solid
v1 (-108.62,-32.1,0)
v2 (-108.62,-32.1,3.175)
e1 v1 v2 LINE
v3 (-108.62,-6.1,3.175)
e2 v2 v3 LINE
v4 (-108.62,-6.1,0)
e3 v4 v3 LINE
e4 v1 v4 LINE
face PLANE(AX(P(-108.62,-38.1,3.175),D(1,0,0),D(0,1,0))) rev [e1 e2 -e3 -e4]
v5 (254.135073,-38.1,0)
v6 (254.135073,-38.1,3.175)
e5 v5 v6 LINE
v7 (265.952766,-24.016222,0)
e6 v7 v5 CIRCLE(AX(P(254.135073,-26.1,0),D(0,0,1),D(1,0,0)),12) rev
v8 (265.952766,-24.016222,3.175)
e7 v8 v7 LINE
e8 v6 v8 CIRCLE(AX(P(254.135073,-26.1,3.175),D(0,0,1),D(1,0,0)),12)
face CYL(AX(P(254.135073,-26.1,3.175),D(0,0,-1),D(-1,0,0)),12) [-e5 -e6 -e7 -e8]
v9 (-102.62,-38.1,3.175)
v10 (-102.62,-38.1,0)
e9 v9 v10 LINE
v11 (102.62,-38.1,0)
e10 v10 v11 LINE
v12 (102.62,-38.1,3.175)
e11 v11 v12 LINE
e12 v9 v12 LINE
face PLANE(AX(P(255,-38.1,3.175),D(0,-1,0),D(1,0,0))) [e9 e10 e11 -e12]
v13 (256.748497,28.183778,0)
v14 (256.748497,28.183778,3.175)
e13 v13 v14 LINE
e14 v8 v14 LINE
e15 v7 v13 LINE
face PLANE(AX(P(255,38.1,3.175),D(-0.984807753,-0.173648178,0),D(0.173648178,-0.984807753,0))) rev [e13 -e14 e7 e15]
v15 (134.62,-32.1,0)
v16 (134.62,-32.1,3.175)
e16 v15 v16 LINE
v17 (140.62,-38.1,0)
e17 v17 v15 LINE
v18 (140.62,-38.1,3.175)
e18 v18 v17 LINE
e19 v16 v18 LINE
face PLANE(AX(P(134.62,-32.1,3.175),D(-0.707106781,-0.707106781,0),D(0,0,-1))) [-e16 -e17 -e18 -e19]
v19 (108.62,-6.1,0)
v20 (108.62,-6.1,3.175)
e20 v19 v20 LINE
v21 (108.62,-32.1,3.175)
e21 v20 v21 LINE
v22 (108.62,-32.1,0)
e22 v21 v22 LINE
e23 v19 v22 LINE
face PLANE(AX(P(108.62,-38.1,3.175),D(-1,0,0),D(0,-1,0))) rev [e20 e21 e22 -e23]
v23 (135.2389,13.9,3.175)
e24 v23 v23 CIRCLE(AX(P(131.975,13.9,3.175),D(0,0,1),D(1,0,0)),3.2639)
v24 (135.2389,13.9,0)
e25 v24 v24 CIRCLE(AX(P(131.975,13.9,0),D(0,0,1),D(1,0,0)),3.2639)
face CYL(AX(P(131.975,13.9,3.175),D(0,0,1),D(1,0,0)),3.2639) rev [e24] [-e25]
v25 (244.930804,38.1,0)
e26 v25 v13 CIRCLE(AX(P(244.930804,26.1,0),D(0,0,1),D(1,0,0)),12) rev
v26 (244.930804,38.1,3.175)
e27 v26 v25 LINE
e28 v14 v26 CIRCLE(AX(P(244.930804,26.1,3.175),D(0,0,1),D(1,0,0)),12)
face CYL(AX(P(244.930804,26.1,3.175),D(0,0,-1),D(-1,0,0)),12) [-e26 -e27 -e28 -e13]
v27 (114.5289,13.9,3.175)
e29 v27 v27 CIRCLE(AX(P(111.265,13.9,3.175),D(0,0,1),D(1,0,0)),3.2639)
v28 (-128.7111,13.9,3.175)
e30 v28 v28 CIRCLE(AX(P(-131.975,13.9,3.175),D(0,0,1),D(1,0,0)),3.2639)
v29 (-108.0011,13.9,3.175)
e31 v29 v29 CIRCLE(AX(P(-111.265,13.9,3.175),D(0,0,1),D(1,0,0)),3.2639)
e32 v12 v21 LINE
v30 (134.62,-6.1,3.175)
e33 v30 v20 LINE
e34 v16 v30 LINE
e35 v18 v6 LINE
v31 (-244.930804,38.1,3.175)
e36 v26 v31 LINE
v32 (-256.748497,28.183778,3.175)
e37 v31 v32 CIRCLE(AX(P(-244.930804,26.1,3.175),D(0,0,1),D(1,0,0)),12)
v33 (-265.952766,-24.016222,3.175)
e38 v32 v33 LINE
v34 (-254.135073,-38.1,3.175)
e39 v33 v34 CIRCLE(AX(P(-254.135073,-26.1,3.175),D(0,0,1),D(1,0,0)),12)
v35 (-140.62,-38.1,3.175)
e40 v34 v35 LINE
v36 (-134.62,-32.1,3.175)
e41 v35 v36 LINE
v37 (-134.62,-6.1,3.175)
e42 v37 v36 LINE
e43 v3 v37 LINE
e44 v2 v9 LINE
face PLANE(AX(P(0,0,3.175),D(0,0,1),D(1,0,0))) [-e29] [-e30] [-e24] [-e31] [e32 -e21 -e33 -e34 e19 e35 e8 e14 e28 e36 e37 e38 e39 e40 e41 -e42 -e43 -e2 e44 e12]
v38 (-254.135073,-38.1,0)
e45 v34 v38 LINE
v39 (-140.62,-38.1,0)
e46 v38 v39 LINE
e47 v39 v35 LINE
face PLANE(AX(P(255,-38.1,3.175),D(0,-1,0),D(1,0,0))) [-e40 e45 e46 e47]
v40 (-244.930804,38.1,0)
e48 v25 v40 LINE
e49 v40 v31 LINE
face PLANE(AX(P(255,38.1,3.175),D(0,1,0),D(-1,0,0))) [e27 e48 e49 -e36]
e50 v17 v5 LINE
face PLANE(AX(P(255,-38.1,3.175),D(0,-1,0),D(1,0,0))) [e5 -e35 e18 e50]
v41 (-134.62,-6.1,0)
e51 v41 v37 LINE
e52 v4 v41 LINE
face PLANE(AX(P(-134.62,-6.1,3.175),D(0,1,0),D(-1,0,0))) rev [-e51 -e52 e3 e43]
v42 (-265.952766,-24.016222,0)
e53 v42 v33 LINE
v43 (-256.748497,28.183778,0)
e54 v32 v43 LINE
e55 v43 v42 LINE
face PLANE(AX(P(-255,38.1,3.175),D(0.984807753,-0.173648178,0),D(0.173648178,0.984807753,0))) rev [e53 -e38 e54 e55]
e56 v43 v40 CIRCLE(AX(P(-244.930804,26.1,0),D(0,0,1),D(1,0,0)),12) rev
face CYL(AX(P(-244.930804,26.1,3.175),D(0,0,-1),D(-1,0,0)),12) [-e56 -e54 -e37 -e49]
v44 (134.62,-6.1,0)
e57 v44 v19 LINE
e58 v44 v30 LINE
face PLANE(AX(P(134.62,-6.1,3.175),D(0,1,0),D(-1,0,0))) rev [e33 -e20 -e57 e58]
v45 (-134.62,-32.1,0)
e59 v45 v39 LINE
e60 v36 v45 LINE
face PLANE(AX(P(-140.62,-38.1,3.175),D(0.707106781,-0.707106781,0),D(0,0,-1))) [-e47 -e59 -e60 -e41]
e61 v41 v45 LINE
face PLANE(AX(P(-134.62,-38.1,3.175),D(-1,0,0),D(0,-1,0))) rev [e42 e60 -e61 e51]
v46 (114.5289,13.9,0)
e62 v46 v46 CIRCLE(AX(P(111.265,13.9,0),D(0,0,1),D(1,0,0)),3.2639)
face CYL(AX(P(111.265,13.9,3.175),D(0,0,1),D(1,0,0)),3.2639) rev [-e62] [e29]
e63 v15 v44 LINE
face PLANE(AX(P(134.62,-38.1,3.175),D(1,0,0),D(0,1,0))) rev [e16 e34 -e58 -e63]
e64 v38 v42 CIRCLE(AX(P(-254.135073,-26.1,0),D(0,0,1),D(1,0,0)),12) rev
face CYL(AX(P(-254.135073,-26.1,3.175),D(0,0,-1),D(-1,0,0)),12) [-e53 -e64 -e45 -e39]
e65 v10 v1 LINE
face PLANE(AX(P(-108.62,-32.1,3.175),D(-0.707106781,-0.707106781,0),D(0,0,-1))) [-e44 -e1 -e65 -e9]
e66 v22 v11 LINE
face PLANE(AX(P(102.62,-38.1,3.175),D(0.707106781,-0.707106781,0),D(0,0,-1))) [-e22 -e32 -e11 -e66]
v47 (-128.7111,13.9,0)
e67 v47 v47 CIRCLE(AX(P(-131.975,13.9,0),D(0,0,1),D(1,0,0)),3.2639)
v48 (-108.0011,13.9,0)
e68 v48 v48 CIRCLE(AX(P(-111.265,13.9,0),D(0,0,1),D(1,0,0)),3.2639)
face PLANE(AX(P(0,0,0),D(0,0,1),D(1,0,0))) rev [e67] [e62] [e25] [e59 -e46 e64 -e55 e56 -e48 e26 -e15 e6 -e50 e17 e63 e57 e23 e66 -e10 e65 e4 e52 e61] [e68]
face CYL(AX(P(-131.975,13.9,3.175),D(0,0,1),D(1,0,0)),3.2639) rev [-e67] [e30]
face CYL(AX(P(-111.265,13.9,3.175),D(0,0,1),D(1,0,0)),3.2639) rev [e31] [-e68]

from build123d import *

# Parameters (mm, degrees)
SKETCH1_W               = 510
SKETCH1_H               = 76.2
BOSS_EXTRUDE1_DEPTH     = 3.175
SKETCH2_W               = 26
SKETCH2_H               = 32
CUT_EXTRUDE1_DEPTH      = 258.850132102
F_1_4_CLEARANCE_HOLE1_D = 6.5278
DRAFT1_ANGLE            = 10
FILLET1_R               = 12
CHAMFER1_SIZE           = 6


with BuildPart() as part:
    # Sketch1 → Boss-Extrude1 (new body)
    with BuildSketch(Plane.XY):
        Rectangle(SKETCH1_W, SKETCH1_H)
    extrude(amount=BOSS_EXTRUDE1_DEPTH)

    # Sketch2 → Cut-Extrude1 (cut, through all)
    with BuildSketch(Plane.XY.offset(3.175)):
        with Locations((121.62, -22.1)):
            Rectangle(SKETCH2_W, SKETCH2_H)
        with Locations((-121.62, -22.1)):
            Rectangle(SKETCH2_W, SKETCH2_H)
    extrude(amount=-CUT_EXTRUDE1_DEPTH, mode=Mode.SUBTRACT)

    # 1/4 Clearance Hole1 (through all)
    with Locations(Plane.XY.offset(3.175)):
        with Locations((-131.975, 13.9), (-111.265, 13.9), (111.265, 13.9), (131.975, 13.9)):
            Hole(F_1_4_CLEARANCE_HOLE1_D / 2)

    # Draft1
    draft1_faces = [part.faces().sort_by_distance(p)[0] for p in [
        (255, 0, 1.5875),
        (-255, 0, 1.5875),
    ]]
    draft(draft1_faces, Plane(origin=(255, 38.1, 3.175), x_dir=(1, 0, 0), z_dir=(0, 1, 0)), DRAFT1_ANGLE)

    # Fillet1
    fillet1_edges = [part.edges().sort_by_distance(p)[0] for p in [
        (-268.43611593, -38.1, 1.5875),
        (-255, 38.1, 1.5875),
        (255, 38.1, 1.5875),
        (268.43611593, -38.1, 1.5875),
    ]]
    fillet(fillet1_edges, radius=FILLET1_R)

    # Chamfer1
    chamfer1_edges = [part.edges().sort_by_distance(p)[0] for p in [
        (-134.62, -38.1, 1.5875),
        (134.62, -38.1, 1.5875),
        (108.62, -38.1, 1.5875),
        (-108.62, -38.1, 1.5875),
    ]]
    chamfer(chamfer1_edges, length=CHAMFER1_SIZE)


solid = part.part
